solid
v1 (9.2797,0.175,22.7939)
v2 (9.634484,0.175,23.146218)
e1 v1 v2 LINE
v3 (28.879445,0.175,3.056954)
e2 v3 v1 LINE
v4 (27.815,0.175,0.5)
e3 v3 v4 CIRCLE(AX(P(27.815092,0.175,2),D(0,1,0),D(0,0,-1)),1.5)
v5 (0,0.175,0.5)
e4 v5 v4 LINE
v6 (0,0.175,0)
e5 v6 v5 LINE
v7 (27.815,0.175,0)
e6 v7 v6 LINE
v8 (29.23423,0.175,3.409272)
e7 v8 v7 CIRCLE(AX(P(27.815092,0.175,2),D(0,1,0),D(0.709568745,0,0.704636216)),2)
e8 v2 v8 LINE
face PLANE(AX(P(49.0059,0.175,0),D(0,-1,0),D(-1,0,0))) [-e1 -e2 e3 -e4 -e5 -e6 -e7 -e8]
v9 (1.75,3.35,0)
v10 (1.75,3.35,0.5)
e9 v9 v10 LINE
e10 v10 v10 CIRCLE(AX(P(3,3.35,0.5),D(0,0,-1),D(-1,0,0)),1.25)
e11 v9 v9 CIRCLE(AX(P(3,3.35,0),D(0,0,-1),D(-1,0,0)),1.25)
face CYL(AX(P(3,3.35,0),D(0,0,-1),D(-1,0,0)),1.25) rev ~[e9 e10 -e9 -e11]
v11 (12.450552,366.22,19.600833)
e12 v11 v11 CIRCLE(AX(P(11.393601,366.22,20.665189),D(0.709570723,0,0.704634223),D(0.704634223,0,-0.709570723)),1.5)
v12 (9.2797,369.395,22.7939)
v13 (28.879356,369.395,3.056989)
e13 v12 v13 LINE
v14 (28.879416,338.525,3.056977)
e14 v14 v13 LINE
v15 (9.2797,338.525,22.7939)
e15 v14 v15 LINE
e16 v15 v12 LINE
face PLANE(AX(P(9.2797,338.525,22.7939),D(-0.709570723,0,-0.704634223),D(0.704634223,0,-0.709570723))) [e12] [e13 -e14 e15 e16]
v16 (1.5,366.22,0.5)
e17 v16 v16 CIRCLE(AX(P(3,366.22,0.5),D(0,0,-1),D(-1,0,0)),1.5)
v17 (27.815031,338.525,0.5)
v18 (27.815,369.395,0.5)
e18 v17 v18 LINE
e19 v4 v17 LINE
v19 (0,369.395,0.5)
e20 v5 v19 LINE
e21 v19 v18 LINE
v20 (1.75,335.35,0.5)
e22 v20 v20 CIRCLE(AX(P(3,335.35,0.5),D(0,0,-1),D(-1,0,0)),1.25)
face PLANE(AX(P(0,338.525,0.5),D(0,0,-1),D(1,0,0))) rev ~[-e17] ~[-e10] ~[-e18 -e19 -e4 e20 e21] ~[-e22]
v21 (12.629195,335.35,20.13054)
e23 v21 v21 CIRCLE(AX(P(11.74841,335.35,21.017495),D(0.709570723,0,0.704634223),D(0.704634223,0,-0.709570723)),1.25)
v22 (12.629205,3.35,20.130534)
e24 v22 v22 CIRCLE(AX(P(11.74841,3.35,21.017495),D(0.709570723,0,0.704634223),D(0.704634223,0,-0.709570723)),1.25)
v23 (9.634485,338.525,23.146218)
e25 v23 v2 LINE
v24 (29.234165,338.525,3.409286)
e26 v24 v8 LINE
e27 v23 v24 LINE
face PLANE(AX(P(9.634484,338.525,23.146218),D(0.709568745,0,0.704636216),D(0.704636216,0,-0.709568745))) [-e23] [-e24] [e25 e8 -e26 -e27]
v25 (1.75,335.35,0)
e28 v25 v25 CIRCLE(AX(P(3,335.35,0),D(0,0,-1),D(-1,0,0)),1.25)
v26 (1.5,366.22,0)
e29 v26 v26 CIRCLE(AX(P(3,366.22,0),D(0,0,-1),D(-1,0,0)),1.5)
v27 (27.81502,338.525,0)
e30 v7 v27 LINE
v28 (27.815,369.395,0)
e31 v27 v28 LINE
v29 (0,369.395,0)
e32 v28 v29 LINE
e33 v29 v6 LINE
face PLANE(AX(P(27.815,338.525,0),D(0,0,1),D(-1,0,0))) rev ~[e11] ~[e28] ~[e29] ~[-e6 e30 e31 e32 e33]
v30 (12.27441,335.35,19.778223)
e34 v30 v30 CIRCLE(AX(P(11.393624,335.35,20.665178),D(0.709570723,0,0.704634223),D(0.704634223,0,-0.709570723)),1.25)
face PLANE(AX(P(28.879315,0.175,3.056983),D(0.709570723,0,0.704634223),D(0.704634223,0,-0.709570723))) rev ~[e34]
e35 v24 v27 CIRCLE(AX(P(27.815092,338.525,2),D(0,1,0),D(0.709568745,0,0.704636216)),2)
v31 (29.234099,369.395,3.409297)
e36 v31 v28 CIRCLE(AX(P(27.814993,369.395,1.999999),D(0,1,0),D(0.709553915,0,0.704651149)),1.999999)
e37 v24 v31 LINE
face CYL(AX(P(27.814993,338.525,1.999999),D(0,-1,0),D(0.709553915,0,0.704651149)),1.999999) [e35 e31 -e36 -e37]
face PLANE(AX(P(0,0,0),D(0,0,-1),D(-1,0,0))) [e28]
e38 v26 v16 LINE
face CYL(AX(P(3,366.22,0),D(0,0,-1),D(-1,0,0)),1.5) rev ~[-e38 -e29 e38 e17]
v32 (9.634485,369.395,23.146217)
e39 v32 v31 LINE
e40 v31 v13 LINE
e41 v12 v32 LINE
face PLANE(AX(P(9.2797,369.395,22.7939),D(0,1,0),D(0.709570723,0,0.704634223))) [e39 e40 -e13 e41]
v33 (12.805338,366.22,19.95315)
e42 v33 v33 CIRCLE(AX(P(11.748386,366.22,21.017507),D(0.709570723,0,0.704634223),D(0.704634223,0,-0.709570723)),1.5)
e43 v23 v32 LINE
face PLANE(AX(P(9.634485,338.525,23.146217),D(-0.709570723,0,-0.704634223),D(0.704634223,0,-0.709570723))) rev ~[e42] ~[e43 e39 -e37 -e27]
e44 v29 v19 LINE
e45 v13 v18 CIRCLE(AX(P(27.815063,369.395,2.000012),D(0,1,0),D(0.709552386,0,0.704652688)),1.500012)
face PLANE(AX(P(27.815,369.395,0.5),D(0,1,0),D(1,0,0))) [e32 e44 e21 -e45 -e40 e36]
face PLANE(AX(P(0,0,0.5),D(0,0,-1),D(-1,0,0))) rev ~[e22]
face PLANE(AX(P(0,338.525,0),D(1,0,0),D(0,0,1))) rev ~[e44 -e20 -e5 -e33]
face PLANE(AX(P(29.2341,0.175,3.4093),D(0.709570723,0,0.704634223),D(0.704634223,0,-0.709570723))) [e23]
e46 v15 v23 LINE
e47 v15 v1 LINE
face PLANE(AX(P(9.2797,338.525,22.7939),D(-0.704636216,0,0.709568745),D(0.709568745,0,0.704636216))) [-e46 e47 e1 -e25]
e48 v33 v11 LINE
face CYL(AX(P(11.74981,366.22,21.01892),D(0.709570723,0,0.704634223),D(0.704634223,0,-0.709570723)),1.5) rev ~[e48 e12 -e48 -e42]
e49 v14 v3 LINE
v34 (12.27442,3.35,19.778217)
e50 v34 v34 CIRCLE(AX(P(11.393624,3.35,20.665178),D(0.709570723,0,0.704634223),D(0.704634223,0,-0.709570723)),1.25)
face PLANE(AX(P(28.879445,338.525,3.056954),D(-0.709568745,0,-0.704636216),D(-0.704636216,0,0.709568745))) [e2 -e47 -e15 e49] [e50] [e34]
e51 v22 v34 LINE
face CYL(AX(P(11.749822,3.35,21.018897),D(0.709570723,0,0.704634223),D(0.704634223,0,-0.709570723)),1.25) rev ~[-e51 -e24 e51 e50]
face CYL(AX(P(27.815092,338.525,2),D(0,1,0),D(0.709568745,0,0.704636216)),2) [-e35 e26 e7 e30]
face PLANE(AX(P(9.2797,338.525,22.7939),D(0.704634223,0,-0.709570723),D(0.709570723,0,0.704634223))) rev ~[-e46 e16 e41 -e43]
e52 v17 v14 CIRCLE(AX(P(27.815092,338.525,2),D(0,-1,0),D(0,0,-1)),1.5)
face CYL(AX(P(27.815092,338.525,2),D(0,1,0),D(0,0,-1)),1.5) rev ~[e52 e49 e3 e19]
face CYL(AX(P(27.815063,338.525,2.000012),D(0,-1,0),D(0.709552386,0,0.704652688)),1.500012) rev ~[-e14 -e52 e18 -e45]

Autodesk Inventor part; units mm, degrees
ref_plane "YZ Plane" through (0, 0, 0) normal (1, 0, 0) x (0, 1, 0)
ref_plane "XZ Plane" through (0, 0, 0) normal (0, 1, 0) x (-1, 0, 0)
ref_plane "XY Plane" through (0, 0, 0) normal (0, 0, 1) x (1, 0, 0)
sketch "Sketch1" plane through (0, 0, 0) normal (0, 0, 1) x (1, 0, 0)
  line L0 (0, 0) -> (27.815, 0)
  line L1 (27.815, 0) -> (27.815, 338.525)
  line L2 (27.815, 338.525) -> (0, 338.525)
  line L3 (0, 338.525) -> (0, 0)
  dimension "d0" = 27.815
  dimension "d1" = 338.525
extrude "Plate1" add sketch "Sketch1" along normal blind 0.5
sketch "Sketch2" plane through (28.8794, 338.525, 3.057) normal (0.7095707, 0, 0.7046342) x (0, 1, 0)
  line L0 (-338.525, 0) -> (0, 0)
  line L1 (0, 0) -> (0, 27.8153)
  line L2 (0, 27.8153) -> (-338.525, 27.8153)
  line L3 (-338.525, 27.8153) -> (-338.525, 0)
edge flange "Flange1" height 32.62 angle 134.8 thickness 0.5 bend radius 1.5 thickness toward (0.7095707, 0, 0.7046342) relief tear relief width 0.5 relief depth 0.25 edges at (27.815, 169.2625, 0.5) wall of the first edge with corners at (28.8794, 0, 3.057) (28.8794, 338.525, 3.057) (9.2797, 338.525, 22.7939) (9.2797, 0, 22.7939)
bend "Bend1"
corner "Corner1"
sketch "Sketch3" plane through (9.6345, 0, 23.1462) normal (0.7095707, 0, 0.7046342) x (0.7046342, 0, -0.7095707)
  line L0 (0, 338.525) -> (27.8153, 338.525) projected
  line L1 (27.8153, 0) -> (0, 0) projected
  line L2 (0, 0) -> (3, 0) construction
  line L3 (3, 0) -> (3, 3.175) construction
  line L4 (0, 338.525) -> (3, 338.525)
  line L5 (3, 338.525) -> (3, 335.35) construction
  circle A0 centre (3, 335.35) radius 1.25
  line L6 (3, 3.175) -> (3, 3.35) construction
  circle A1 centre (3, 3.35) radius 1.25
  point P0 (9.635, 0)
  dimension "d13" = 3
  dimension "d14" = 3.175
  dimension "d16" = 3
  dimension "d17" = 3.175
  dimension "d18" = 2.5
  dimension "d34" = 0.175
  dimension "d35" = 2.5
extrude "Extrusion1" cut sketch "Sketch3" against normal blind 10
sketch "Sketch4" plane through (0, 0, 0) normal (0, 0, -1) x (-1, 0, 0)
  line L0 (0, 0) -> (-27.815, 0) projected
  line L1 (0, 0) -> (-3, 0) construction
  line L2 (-3, 0) -> (-3, 3.175) construction
  line L3 (0, 338.525) -> (-3, 338.525) construction
  line L4 (0, 338.525) -> (-27.815, 338.525) construction
  line L5 (-3, 338.525) -> (-3, 335.35) construction
  circle A0 centre (-3, 335.35) radius 1.25
  line L6 (-3, 3.175) -> (-3, 3.35) construction
  circle A1 centre (-3, 3.35) radius 1.25
  dimension "d21" = 3
  dimension "d22" = 3.175
  dimension "d24" = 3
  dimension "d25" = 3.175
  dimension "d26" = 2.5
  dimension "d32" = 0.175
  dimension "d33" = 2.5
extrude "Extrusion2" cut sketch "Sketch4" against normal blind 10
sketch "Sketch5" plane through (0, 0, 0) normal (0, 0, -1) x (-1, 0, 0)
  line L0 (0, 0) -> (-49.0059, 0)
  line L1 (-49.0059, 0) -> (-49.0059, 0.175)
  line L2 (-49.0059, 0.175) -> (0, 0.175)
  line L3 (0, 0.175) -> (0, 0)
  dimension "d29" = 0.175
extrude "Extrusion3" cut sketch "Sketch5" against normal blind 100
sketch "Sketch6" plane through (0, 338.525, 0) normal (0, 1, 0) x (1, 0, 0)
  line L0 (0, -0.5) -> (27.815, -0.5) projected
  line L1 (27.815, 0) -> (27.815, -0.5) projected
  line L2 (27.815, 0) -> (0, 0) projected
  line L3 (0, 0) -> (0, -0.5) projected
extrude "Extrusion4" add sketch "Sketch6" along normal blind 30.87
sketch "Sketch7" plane through (27.815, 338.525, 0.5) normal (0, 1, 0) x (1, 0, 0)
  line L0 (1.4191, -2.9093) -> (1.0644, -2.557) projected
  arc A0 (1.4191, -2.9093) -> (0, 0.5) centre (0, -1.5) ccw projected
  line L1 (0, 0.5) -> (0, 0) projected
  arc A1 (1.0644, -2.557) -> (0, 0) centre (0, -1.5) ccw projected
  point P0 (-27.815, 0.5)
extrude "Extrusion5" add sketch "Sketch7" along normal blind 30.87
sketch "Sketch8" plane through (9.2797, 338.525, 22.7939) normal (0, 1, 0) x (0.7095707, 0, 0.7046342)
  line L0 (0.5, 27.8153) -> (0, 27.8153) projected
  line L1 (0, 0) -> (0, 27.8153) projected
  line L2 (0, 0) -> (0.5, 0) projected
  line L3 (0.5, 0) -> (0.5, 27.8153) projected
  point P0 (-22.646, 9.635)
extrude "Extrusion6" add sketch "Sketch8" along normal blind 30.87
sketch "Sketch9" plane through (29.2341, 0.175, 3.4093) normal (0.7095707, 0, 0.7046342) x (0.7046342, 0, -0.7095707)
  circle A0 centre (-24.8153, 335.175) radius 1.25 projected
  point P0 (-18.1803, -0.175)
extrude "Extrusion7" add sketch "Sketch9" against normal up to surface (0.5 mm away)
sketch "Sketch10" plane through (0, 0, 0) normal (0, 0, -1) x (-1, 0, 0)
  circle A0 centre (-3, 335.35) radius 1.25 projected
  point P0 (0, 0)
extrude "Extrusion8" add sketch "Sketch10" against normal up to surface (0.5 mm away)
sketch "Sketch11" plane through (0, 0, 0) normal (0, 0, -1) x (-1, 0, 0)
  line L0 (0, 0.175) -> (0, 369.395) projected
  line L1 (0, 369.395) -> (0, 366.22) construction
  line L2 (0, 366.22) -> (-3, 366.22) construction
  circle A0 centre (-3, 366.22) radius 1.5
  point P0 (0, 0)
  dimension "d46" = 3.175
  dimension "d47" = 3
  dimension "d48" = 3
extrude "Extrusion9" cut sketch "Sketch11" against normal blind 30.87
sketch "Sketch12" plane through (29.2341, 0.175, 3.4093) normal (0.7095707, 0, 0.7046342) x (0.7046342, 0, -0.7095707)
  line L0 (-27.8153, 0) -> (-27.8153, 369.22) projected
  line L1 (-27.8153, 369.22) -> (-27.8153, 366.045) construction
  line L2 (-27.8153, 0) -> (-27.8153, 369.22) construction
  line L3 (-27.8153, 366.045) -> (-24.8153, 366.045) construction
  circle A0 centre (-24.8153, 366.045) radius 1.5
  point P0 (-18.1803, -0.175)
  dimension "d51" = 3.175
  dimension "d52" = 3
  dimension "d53" = 3
extrude "Extrusion10" cut sketch "Sketch12" against normal blind 30.87
equation "\"d2\" = Thickness"
equation "\"d3\" = BendReliefWidth"
equation "\"d4\" = BendReliefDepth"
equation "\"d5\" = MinimumRemnant"
equation "\"d6\" = TransitionRadius"
equation "\"d10\" = CornerReliefSize"
equation "\"d11\" = GapSize"
equation "\"d12\" = JacobiRadiusSize"
equation "\"BendRadius\" = Thickness"
equation "\"BendReliefWidth\" = Thickness"
equation "\"BendReliefDepth\" = 0.5 * Thickness"
equation "\"CornerReliefSize\" = 4 * Thickness"
equation "\"MinimumRemnant\" = 2 * Thickness"
equation "\"TransitionRadius\" = BendRadius"
equation "\"JacobiRadiusSize\" = BendRadius"
equation "\"GapSize\" = Thickness"
equation "\"Thickness\" = 0.5"
properties part number "sideplate part 3" material "Aluminum 6061"
